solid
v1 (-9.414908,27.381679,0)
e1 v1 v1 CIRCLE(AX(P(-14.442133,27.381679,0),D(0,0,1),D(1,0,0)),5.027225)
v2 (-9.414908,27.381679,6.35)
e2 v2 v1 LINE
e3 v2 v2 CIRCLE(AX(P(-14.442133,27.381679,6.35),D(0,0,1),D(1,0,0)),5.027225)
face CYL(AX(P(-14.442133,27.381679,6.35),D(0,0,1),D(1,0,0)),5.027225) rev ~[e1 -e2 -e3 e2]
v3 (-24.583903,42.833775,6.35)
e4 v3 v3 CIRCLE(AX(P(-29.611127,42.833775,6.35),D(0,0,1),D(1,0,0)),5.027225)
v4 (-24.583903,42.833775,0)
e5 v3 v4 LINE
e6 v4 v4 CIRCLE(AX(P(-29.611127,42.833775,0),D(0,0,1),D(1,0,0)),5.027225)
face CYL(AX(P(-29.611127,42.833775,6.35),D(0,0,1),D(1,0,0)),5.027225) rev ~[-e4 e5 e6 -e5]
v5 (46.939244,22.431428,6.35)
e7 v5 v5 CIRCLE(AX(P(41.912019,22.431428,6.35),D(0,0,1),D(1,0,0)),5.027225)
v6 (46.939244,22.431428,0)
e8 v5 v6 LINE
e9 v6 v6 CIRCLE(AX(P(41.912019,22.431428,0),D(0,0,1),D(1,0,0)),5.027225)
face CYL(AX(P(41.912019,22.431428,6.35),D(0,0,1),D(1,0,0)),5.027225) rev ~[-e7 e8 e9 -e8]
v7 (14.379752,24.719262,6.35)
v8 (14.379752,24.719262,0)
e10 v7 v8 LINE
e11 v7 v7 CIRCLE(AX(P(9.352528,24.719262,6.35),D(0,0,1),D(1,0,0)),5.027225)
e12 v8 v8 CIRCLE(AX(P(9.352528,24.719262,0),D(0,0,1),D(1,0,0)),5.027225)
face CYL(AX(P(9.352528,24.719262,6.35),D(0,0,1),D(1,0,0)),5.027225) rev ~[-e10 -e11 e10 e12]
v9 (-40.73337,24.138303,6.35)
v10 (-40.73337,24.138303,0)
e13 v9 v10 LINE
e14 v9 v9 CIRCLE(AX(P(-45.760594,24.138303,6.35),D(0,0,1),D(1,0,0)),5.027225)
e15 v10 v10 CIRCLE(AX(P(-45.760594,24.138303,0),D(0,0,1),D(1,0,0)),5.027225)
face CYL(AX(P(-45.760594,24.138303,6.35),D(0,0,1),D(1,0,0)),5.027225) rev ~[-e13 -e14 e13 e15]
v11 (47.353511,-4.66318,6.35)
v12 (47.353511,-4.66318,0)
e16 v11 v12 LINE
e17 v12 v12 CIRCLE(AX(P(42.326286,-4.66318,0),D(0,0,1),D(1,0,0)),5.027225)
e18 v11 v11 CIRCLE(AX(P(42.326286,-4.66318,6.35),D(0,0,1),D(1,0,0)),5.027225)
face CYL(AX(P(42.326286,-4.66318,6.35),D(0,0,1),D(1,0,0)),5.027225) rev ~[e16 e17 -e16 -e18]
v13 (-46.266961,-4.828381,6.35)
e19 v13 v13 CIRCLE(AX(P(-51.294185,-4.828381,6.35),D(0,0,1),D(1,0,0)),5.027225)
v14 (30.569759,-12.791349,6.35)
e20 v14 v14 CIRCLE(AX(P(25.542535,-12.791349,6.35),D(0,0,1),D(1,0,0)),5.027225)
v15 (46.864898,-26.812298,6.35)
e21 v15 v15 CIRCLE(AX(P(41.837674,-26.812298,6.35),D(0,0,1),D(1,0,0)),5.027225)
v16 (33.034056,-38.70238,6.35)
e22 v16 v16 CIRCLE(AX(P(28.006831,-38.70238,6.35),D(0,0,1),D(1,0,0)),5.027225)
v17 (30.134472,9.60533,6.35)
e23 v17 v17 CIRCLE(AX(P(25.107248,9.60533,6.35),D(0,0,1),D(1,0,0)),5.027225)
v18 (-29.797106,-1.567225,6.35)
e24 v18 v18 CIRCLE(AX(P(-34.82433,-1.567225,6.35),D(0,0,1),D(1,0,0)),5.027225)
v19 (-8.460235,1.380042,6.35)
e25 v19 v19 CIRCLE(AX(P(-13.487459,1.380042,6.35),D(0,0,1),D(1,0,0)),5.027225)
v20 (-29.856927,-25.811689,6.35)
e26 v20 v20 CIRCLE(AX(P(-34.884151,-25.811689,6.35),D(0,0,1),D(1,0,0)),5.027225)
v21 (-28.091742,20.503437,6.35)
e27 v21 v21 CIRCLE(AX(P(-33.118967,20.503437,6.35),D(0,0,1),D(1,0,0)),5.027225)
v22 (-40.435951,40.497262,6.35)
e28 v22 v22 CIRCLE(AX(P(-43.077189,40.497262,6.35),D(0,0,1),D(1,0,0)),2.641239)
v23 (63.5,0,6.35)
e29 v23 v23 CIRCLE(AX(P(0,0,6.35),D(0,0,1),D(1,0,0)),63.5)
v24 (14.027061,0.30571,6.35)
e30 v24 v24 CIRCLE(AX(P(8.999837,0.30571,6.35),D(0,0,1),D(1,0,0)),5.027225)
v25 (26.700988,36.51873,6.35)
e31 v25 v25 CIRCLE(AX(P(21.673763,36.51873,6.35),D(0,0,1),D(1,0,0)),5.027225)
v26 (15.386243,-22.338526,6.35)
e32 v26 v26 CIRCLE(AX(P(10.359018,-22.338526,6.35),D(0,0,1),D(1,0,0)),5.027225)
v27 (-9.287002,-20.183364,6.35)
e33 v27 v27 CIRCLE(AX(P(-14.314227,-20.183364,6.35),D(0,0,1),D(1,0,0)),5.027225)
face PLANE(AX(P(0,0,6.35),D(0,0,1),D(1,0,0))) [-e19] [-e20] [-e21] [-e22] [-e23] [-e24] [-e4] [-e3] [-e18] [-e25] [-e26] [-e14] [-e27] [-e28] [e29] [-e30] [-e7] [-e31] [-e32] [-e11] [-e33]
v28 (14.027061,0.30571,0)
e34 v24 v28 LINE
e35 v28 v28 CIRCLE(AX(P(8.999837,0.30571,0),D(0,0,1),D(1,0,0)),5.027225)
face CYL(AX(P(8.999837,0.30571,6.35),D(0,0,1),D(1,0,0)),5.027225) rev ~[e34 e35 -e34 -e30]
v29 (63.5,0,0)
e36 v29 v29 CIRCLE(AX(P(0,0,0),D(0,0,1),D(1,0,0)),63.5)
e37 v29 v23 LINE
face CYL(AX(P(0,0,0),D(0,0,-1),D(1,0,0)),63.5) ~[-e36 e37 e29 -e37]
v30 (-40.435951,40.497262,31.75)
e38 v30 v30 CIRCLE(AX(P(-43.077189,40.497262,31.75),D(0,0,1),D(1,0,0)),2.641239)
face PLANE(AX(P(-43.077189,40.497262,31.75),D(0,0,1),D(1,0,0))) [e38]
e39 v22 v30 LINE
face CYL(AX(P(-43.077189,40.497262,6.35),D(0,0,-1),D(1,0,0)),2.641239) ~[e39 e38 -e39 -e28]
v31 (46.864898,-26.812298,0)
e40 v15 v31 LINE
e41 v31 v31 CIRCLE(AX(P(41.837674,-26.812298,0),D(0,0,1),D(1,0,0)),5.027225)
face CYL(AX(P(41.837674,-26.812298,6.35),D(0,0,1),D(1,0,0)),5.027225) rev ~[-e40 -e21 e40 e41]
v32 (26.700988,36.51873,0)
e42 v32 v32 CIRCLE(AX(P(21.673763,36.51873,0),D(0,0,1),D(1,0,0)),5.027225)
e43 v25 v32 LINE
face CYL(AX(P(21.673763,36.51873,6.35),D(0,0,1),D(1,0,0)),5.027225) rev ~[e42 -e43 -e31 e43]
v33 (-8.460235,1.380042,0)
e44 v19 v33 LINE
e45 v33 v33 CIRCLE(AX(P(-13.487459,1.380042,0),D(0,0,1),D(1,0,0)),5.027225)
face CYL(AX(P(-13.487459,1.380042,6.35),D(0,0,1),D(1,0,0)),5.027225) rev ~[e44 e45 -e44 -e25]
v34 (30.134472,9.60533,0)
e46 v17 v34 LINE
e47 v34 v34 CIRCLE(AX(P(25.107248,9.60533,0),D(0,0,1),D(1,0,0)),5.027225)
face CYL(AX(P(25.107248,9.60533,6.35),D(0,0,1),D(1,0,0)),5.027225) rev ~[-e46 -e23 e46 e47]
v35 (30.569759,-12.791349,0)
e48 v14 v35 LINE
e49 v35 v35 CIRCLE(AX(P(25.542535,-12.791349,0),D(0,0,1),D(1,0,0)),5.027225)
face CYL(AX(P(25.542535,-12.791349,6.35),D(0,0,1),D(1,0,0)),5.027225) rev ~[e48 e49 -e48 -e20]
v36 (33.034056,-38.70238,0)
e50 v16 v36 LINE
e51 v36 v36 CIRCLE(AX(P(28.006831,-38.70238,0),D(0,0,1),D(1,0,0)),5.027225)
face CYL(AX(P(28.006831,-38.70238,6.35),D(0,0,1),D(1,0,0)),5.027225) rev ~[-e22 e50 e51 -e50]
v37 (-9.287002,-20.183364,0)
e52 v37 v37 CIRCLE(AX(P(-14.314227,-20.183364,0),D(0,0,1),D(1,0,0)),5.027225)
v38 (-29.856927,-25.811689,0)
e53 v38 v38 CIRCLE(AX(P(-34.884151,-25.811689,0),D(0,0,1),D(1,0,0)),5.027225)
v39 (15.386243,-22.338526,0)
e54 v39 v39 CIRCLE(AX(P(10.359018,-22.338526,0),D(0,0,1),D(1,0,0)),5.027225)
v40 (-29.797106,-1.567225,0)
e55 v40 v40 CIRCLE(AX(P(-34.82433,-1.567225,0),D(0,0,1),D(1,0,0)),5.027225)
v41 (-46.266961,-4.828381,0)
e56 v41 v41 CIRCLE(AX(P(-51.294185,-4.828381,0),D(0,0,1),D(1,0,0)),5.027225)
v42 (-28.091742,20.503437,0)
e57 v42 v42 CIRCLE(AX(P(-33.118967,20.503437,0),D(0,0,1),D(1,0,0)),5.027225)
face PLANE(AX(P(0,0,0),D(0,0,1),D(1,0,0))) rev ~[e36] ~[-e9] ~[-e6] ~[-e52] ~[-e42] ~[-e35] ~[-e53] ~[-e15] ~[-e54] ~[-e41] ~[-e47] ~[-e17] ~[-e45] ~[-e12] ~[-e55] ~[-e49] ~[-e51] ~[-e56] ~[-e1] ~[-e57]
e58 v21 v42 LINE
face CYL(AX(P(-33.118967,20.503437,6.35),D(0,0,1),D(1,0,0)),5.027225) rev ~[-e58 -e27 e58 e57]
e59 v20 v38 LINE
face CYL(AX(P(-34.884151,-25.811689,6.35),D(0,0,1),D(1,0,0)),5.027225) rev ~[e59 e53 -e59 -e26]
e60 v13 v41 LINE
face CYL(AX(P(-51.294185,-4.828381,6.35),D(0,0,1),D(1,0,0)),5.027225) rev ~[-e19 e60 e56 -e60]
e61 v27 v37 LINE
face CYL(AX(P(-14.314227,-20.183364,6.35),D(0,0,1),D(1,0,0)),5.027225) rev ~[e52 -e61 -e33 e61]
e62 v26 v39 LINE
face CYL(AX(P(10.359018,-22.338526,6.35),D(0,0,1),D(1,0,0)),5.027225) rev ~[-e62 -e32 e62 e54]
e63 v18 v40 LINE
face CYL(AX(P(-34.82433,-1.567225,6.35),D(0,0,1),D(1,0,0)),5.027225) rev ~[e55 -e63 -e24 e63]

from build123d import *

# Parameters (mm, degrees)
F0_R     = 63.5
F1_DEPTH = 6.35
F2_R     = 5.0272245411
F3_DEPTH = 25.4
F4_R     = 2.641238627
F5_DEPTH = 25.4


# Not quite as in the source:
# - the program builds the solid bodies; features that only make, move or delete a surface that nothing else refers to are left out


with BuildPart() as f1:
    # F0 (on Top) → F1 (new body)
    with BuildSketch(Plane.XY):
        Circle(F0_R)
    extrude(amount=F1_DEPTH)

    # F2 (on face) → F3 (cut)
    with BuildSketch(Plane.XY.offset(6.35)):
        with Locations((-51.2941852212, -4.8283813521)):
            Circle(F2_R)
        with Locations((-45.7605943084, 24.1383034736)):
            Circle(F2_R)
        with Locations((-29.6111274511, 42.8337752819)):
            Circle(F2_R)
        with Locations((-33.1189669669, 20.5034371465)):
            Circle(F2_R)
        with Locations((-34.8243303597, -1.5672247391)):
            Circle(F2_R)
        with Locations((-34.8841510713, -25.8116889745)):
            Circle(F2_R)
        with Locations((-14.3142268062, -20.1833639294)):
            Circle(F2_R)
        with Locations((-13.4874591604, 1.3800424058)):
            Circle(F2_R)
        with Locations((-14.4421327859, 27.3816790432)):
            Circle(F2_R)
        with Locations((21.6737631708, 36.5187302232)):
            Circle(F2_R)
        with Locations((9.3525275588, 24.7192624956)):
            Circle(F2_R)
        with Locations((8.9998366311, 0.3057096619)):
            Circle(F2_R)
        with Locations((10.3590181097, -22.3385263234)):
            Circle(F2_R)
        with Locations((28.006831184, -38.7023799121)):
            Circle(F2_R)
        with Locations((25.5425348878, -12.7913486212)):
            Circle(F2_R)
        with Locations((25.1072477549, 9.6053304151)):
            Circle(F2_R)
        with Locations((41.9120192528, 22.4314276129)):
            Circle(F2_R)
        with Locations((42.3262864351, -4.6631796286)):
            Circle(F2_R)
        with Locations((41.8376736343, -26.8122982234)):
            Circle(F2_R)
    extrude(amount=-F3_DEPTH, mode=Mode.SUBTRACT)

    # F4 (on face) → F5 (join)
    with BuildSketch(Plane.XY.offset(6.35)):
        with Locations((-43.0771894753, 40.4972620308)):
            Circle(F4_R)
    extrude(amount=F5_DEPTH)


solid = f1.part
